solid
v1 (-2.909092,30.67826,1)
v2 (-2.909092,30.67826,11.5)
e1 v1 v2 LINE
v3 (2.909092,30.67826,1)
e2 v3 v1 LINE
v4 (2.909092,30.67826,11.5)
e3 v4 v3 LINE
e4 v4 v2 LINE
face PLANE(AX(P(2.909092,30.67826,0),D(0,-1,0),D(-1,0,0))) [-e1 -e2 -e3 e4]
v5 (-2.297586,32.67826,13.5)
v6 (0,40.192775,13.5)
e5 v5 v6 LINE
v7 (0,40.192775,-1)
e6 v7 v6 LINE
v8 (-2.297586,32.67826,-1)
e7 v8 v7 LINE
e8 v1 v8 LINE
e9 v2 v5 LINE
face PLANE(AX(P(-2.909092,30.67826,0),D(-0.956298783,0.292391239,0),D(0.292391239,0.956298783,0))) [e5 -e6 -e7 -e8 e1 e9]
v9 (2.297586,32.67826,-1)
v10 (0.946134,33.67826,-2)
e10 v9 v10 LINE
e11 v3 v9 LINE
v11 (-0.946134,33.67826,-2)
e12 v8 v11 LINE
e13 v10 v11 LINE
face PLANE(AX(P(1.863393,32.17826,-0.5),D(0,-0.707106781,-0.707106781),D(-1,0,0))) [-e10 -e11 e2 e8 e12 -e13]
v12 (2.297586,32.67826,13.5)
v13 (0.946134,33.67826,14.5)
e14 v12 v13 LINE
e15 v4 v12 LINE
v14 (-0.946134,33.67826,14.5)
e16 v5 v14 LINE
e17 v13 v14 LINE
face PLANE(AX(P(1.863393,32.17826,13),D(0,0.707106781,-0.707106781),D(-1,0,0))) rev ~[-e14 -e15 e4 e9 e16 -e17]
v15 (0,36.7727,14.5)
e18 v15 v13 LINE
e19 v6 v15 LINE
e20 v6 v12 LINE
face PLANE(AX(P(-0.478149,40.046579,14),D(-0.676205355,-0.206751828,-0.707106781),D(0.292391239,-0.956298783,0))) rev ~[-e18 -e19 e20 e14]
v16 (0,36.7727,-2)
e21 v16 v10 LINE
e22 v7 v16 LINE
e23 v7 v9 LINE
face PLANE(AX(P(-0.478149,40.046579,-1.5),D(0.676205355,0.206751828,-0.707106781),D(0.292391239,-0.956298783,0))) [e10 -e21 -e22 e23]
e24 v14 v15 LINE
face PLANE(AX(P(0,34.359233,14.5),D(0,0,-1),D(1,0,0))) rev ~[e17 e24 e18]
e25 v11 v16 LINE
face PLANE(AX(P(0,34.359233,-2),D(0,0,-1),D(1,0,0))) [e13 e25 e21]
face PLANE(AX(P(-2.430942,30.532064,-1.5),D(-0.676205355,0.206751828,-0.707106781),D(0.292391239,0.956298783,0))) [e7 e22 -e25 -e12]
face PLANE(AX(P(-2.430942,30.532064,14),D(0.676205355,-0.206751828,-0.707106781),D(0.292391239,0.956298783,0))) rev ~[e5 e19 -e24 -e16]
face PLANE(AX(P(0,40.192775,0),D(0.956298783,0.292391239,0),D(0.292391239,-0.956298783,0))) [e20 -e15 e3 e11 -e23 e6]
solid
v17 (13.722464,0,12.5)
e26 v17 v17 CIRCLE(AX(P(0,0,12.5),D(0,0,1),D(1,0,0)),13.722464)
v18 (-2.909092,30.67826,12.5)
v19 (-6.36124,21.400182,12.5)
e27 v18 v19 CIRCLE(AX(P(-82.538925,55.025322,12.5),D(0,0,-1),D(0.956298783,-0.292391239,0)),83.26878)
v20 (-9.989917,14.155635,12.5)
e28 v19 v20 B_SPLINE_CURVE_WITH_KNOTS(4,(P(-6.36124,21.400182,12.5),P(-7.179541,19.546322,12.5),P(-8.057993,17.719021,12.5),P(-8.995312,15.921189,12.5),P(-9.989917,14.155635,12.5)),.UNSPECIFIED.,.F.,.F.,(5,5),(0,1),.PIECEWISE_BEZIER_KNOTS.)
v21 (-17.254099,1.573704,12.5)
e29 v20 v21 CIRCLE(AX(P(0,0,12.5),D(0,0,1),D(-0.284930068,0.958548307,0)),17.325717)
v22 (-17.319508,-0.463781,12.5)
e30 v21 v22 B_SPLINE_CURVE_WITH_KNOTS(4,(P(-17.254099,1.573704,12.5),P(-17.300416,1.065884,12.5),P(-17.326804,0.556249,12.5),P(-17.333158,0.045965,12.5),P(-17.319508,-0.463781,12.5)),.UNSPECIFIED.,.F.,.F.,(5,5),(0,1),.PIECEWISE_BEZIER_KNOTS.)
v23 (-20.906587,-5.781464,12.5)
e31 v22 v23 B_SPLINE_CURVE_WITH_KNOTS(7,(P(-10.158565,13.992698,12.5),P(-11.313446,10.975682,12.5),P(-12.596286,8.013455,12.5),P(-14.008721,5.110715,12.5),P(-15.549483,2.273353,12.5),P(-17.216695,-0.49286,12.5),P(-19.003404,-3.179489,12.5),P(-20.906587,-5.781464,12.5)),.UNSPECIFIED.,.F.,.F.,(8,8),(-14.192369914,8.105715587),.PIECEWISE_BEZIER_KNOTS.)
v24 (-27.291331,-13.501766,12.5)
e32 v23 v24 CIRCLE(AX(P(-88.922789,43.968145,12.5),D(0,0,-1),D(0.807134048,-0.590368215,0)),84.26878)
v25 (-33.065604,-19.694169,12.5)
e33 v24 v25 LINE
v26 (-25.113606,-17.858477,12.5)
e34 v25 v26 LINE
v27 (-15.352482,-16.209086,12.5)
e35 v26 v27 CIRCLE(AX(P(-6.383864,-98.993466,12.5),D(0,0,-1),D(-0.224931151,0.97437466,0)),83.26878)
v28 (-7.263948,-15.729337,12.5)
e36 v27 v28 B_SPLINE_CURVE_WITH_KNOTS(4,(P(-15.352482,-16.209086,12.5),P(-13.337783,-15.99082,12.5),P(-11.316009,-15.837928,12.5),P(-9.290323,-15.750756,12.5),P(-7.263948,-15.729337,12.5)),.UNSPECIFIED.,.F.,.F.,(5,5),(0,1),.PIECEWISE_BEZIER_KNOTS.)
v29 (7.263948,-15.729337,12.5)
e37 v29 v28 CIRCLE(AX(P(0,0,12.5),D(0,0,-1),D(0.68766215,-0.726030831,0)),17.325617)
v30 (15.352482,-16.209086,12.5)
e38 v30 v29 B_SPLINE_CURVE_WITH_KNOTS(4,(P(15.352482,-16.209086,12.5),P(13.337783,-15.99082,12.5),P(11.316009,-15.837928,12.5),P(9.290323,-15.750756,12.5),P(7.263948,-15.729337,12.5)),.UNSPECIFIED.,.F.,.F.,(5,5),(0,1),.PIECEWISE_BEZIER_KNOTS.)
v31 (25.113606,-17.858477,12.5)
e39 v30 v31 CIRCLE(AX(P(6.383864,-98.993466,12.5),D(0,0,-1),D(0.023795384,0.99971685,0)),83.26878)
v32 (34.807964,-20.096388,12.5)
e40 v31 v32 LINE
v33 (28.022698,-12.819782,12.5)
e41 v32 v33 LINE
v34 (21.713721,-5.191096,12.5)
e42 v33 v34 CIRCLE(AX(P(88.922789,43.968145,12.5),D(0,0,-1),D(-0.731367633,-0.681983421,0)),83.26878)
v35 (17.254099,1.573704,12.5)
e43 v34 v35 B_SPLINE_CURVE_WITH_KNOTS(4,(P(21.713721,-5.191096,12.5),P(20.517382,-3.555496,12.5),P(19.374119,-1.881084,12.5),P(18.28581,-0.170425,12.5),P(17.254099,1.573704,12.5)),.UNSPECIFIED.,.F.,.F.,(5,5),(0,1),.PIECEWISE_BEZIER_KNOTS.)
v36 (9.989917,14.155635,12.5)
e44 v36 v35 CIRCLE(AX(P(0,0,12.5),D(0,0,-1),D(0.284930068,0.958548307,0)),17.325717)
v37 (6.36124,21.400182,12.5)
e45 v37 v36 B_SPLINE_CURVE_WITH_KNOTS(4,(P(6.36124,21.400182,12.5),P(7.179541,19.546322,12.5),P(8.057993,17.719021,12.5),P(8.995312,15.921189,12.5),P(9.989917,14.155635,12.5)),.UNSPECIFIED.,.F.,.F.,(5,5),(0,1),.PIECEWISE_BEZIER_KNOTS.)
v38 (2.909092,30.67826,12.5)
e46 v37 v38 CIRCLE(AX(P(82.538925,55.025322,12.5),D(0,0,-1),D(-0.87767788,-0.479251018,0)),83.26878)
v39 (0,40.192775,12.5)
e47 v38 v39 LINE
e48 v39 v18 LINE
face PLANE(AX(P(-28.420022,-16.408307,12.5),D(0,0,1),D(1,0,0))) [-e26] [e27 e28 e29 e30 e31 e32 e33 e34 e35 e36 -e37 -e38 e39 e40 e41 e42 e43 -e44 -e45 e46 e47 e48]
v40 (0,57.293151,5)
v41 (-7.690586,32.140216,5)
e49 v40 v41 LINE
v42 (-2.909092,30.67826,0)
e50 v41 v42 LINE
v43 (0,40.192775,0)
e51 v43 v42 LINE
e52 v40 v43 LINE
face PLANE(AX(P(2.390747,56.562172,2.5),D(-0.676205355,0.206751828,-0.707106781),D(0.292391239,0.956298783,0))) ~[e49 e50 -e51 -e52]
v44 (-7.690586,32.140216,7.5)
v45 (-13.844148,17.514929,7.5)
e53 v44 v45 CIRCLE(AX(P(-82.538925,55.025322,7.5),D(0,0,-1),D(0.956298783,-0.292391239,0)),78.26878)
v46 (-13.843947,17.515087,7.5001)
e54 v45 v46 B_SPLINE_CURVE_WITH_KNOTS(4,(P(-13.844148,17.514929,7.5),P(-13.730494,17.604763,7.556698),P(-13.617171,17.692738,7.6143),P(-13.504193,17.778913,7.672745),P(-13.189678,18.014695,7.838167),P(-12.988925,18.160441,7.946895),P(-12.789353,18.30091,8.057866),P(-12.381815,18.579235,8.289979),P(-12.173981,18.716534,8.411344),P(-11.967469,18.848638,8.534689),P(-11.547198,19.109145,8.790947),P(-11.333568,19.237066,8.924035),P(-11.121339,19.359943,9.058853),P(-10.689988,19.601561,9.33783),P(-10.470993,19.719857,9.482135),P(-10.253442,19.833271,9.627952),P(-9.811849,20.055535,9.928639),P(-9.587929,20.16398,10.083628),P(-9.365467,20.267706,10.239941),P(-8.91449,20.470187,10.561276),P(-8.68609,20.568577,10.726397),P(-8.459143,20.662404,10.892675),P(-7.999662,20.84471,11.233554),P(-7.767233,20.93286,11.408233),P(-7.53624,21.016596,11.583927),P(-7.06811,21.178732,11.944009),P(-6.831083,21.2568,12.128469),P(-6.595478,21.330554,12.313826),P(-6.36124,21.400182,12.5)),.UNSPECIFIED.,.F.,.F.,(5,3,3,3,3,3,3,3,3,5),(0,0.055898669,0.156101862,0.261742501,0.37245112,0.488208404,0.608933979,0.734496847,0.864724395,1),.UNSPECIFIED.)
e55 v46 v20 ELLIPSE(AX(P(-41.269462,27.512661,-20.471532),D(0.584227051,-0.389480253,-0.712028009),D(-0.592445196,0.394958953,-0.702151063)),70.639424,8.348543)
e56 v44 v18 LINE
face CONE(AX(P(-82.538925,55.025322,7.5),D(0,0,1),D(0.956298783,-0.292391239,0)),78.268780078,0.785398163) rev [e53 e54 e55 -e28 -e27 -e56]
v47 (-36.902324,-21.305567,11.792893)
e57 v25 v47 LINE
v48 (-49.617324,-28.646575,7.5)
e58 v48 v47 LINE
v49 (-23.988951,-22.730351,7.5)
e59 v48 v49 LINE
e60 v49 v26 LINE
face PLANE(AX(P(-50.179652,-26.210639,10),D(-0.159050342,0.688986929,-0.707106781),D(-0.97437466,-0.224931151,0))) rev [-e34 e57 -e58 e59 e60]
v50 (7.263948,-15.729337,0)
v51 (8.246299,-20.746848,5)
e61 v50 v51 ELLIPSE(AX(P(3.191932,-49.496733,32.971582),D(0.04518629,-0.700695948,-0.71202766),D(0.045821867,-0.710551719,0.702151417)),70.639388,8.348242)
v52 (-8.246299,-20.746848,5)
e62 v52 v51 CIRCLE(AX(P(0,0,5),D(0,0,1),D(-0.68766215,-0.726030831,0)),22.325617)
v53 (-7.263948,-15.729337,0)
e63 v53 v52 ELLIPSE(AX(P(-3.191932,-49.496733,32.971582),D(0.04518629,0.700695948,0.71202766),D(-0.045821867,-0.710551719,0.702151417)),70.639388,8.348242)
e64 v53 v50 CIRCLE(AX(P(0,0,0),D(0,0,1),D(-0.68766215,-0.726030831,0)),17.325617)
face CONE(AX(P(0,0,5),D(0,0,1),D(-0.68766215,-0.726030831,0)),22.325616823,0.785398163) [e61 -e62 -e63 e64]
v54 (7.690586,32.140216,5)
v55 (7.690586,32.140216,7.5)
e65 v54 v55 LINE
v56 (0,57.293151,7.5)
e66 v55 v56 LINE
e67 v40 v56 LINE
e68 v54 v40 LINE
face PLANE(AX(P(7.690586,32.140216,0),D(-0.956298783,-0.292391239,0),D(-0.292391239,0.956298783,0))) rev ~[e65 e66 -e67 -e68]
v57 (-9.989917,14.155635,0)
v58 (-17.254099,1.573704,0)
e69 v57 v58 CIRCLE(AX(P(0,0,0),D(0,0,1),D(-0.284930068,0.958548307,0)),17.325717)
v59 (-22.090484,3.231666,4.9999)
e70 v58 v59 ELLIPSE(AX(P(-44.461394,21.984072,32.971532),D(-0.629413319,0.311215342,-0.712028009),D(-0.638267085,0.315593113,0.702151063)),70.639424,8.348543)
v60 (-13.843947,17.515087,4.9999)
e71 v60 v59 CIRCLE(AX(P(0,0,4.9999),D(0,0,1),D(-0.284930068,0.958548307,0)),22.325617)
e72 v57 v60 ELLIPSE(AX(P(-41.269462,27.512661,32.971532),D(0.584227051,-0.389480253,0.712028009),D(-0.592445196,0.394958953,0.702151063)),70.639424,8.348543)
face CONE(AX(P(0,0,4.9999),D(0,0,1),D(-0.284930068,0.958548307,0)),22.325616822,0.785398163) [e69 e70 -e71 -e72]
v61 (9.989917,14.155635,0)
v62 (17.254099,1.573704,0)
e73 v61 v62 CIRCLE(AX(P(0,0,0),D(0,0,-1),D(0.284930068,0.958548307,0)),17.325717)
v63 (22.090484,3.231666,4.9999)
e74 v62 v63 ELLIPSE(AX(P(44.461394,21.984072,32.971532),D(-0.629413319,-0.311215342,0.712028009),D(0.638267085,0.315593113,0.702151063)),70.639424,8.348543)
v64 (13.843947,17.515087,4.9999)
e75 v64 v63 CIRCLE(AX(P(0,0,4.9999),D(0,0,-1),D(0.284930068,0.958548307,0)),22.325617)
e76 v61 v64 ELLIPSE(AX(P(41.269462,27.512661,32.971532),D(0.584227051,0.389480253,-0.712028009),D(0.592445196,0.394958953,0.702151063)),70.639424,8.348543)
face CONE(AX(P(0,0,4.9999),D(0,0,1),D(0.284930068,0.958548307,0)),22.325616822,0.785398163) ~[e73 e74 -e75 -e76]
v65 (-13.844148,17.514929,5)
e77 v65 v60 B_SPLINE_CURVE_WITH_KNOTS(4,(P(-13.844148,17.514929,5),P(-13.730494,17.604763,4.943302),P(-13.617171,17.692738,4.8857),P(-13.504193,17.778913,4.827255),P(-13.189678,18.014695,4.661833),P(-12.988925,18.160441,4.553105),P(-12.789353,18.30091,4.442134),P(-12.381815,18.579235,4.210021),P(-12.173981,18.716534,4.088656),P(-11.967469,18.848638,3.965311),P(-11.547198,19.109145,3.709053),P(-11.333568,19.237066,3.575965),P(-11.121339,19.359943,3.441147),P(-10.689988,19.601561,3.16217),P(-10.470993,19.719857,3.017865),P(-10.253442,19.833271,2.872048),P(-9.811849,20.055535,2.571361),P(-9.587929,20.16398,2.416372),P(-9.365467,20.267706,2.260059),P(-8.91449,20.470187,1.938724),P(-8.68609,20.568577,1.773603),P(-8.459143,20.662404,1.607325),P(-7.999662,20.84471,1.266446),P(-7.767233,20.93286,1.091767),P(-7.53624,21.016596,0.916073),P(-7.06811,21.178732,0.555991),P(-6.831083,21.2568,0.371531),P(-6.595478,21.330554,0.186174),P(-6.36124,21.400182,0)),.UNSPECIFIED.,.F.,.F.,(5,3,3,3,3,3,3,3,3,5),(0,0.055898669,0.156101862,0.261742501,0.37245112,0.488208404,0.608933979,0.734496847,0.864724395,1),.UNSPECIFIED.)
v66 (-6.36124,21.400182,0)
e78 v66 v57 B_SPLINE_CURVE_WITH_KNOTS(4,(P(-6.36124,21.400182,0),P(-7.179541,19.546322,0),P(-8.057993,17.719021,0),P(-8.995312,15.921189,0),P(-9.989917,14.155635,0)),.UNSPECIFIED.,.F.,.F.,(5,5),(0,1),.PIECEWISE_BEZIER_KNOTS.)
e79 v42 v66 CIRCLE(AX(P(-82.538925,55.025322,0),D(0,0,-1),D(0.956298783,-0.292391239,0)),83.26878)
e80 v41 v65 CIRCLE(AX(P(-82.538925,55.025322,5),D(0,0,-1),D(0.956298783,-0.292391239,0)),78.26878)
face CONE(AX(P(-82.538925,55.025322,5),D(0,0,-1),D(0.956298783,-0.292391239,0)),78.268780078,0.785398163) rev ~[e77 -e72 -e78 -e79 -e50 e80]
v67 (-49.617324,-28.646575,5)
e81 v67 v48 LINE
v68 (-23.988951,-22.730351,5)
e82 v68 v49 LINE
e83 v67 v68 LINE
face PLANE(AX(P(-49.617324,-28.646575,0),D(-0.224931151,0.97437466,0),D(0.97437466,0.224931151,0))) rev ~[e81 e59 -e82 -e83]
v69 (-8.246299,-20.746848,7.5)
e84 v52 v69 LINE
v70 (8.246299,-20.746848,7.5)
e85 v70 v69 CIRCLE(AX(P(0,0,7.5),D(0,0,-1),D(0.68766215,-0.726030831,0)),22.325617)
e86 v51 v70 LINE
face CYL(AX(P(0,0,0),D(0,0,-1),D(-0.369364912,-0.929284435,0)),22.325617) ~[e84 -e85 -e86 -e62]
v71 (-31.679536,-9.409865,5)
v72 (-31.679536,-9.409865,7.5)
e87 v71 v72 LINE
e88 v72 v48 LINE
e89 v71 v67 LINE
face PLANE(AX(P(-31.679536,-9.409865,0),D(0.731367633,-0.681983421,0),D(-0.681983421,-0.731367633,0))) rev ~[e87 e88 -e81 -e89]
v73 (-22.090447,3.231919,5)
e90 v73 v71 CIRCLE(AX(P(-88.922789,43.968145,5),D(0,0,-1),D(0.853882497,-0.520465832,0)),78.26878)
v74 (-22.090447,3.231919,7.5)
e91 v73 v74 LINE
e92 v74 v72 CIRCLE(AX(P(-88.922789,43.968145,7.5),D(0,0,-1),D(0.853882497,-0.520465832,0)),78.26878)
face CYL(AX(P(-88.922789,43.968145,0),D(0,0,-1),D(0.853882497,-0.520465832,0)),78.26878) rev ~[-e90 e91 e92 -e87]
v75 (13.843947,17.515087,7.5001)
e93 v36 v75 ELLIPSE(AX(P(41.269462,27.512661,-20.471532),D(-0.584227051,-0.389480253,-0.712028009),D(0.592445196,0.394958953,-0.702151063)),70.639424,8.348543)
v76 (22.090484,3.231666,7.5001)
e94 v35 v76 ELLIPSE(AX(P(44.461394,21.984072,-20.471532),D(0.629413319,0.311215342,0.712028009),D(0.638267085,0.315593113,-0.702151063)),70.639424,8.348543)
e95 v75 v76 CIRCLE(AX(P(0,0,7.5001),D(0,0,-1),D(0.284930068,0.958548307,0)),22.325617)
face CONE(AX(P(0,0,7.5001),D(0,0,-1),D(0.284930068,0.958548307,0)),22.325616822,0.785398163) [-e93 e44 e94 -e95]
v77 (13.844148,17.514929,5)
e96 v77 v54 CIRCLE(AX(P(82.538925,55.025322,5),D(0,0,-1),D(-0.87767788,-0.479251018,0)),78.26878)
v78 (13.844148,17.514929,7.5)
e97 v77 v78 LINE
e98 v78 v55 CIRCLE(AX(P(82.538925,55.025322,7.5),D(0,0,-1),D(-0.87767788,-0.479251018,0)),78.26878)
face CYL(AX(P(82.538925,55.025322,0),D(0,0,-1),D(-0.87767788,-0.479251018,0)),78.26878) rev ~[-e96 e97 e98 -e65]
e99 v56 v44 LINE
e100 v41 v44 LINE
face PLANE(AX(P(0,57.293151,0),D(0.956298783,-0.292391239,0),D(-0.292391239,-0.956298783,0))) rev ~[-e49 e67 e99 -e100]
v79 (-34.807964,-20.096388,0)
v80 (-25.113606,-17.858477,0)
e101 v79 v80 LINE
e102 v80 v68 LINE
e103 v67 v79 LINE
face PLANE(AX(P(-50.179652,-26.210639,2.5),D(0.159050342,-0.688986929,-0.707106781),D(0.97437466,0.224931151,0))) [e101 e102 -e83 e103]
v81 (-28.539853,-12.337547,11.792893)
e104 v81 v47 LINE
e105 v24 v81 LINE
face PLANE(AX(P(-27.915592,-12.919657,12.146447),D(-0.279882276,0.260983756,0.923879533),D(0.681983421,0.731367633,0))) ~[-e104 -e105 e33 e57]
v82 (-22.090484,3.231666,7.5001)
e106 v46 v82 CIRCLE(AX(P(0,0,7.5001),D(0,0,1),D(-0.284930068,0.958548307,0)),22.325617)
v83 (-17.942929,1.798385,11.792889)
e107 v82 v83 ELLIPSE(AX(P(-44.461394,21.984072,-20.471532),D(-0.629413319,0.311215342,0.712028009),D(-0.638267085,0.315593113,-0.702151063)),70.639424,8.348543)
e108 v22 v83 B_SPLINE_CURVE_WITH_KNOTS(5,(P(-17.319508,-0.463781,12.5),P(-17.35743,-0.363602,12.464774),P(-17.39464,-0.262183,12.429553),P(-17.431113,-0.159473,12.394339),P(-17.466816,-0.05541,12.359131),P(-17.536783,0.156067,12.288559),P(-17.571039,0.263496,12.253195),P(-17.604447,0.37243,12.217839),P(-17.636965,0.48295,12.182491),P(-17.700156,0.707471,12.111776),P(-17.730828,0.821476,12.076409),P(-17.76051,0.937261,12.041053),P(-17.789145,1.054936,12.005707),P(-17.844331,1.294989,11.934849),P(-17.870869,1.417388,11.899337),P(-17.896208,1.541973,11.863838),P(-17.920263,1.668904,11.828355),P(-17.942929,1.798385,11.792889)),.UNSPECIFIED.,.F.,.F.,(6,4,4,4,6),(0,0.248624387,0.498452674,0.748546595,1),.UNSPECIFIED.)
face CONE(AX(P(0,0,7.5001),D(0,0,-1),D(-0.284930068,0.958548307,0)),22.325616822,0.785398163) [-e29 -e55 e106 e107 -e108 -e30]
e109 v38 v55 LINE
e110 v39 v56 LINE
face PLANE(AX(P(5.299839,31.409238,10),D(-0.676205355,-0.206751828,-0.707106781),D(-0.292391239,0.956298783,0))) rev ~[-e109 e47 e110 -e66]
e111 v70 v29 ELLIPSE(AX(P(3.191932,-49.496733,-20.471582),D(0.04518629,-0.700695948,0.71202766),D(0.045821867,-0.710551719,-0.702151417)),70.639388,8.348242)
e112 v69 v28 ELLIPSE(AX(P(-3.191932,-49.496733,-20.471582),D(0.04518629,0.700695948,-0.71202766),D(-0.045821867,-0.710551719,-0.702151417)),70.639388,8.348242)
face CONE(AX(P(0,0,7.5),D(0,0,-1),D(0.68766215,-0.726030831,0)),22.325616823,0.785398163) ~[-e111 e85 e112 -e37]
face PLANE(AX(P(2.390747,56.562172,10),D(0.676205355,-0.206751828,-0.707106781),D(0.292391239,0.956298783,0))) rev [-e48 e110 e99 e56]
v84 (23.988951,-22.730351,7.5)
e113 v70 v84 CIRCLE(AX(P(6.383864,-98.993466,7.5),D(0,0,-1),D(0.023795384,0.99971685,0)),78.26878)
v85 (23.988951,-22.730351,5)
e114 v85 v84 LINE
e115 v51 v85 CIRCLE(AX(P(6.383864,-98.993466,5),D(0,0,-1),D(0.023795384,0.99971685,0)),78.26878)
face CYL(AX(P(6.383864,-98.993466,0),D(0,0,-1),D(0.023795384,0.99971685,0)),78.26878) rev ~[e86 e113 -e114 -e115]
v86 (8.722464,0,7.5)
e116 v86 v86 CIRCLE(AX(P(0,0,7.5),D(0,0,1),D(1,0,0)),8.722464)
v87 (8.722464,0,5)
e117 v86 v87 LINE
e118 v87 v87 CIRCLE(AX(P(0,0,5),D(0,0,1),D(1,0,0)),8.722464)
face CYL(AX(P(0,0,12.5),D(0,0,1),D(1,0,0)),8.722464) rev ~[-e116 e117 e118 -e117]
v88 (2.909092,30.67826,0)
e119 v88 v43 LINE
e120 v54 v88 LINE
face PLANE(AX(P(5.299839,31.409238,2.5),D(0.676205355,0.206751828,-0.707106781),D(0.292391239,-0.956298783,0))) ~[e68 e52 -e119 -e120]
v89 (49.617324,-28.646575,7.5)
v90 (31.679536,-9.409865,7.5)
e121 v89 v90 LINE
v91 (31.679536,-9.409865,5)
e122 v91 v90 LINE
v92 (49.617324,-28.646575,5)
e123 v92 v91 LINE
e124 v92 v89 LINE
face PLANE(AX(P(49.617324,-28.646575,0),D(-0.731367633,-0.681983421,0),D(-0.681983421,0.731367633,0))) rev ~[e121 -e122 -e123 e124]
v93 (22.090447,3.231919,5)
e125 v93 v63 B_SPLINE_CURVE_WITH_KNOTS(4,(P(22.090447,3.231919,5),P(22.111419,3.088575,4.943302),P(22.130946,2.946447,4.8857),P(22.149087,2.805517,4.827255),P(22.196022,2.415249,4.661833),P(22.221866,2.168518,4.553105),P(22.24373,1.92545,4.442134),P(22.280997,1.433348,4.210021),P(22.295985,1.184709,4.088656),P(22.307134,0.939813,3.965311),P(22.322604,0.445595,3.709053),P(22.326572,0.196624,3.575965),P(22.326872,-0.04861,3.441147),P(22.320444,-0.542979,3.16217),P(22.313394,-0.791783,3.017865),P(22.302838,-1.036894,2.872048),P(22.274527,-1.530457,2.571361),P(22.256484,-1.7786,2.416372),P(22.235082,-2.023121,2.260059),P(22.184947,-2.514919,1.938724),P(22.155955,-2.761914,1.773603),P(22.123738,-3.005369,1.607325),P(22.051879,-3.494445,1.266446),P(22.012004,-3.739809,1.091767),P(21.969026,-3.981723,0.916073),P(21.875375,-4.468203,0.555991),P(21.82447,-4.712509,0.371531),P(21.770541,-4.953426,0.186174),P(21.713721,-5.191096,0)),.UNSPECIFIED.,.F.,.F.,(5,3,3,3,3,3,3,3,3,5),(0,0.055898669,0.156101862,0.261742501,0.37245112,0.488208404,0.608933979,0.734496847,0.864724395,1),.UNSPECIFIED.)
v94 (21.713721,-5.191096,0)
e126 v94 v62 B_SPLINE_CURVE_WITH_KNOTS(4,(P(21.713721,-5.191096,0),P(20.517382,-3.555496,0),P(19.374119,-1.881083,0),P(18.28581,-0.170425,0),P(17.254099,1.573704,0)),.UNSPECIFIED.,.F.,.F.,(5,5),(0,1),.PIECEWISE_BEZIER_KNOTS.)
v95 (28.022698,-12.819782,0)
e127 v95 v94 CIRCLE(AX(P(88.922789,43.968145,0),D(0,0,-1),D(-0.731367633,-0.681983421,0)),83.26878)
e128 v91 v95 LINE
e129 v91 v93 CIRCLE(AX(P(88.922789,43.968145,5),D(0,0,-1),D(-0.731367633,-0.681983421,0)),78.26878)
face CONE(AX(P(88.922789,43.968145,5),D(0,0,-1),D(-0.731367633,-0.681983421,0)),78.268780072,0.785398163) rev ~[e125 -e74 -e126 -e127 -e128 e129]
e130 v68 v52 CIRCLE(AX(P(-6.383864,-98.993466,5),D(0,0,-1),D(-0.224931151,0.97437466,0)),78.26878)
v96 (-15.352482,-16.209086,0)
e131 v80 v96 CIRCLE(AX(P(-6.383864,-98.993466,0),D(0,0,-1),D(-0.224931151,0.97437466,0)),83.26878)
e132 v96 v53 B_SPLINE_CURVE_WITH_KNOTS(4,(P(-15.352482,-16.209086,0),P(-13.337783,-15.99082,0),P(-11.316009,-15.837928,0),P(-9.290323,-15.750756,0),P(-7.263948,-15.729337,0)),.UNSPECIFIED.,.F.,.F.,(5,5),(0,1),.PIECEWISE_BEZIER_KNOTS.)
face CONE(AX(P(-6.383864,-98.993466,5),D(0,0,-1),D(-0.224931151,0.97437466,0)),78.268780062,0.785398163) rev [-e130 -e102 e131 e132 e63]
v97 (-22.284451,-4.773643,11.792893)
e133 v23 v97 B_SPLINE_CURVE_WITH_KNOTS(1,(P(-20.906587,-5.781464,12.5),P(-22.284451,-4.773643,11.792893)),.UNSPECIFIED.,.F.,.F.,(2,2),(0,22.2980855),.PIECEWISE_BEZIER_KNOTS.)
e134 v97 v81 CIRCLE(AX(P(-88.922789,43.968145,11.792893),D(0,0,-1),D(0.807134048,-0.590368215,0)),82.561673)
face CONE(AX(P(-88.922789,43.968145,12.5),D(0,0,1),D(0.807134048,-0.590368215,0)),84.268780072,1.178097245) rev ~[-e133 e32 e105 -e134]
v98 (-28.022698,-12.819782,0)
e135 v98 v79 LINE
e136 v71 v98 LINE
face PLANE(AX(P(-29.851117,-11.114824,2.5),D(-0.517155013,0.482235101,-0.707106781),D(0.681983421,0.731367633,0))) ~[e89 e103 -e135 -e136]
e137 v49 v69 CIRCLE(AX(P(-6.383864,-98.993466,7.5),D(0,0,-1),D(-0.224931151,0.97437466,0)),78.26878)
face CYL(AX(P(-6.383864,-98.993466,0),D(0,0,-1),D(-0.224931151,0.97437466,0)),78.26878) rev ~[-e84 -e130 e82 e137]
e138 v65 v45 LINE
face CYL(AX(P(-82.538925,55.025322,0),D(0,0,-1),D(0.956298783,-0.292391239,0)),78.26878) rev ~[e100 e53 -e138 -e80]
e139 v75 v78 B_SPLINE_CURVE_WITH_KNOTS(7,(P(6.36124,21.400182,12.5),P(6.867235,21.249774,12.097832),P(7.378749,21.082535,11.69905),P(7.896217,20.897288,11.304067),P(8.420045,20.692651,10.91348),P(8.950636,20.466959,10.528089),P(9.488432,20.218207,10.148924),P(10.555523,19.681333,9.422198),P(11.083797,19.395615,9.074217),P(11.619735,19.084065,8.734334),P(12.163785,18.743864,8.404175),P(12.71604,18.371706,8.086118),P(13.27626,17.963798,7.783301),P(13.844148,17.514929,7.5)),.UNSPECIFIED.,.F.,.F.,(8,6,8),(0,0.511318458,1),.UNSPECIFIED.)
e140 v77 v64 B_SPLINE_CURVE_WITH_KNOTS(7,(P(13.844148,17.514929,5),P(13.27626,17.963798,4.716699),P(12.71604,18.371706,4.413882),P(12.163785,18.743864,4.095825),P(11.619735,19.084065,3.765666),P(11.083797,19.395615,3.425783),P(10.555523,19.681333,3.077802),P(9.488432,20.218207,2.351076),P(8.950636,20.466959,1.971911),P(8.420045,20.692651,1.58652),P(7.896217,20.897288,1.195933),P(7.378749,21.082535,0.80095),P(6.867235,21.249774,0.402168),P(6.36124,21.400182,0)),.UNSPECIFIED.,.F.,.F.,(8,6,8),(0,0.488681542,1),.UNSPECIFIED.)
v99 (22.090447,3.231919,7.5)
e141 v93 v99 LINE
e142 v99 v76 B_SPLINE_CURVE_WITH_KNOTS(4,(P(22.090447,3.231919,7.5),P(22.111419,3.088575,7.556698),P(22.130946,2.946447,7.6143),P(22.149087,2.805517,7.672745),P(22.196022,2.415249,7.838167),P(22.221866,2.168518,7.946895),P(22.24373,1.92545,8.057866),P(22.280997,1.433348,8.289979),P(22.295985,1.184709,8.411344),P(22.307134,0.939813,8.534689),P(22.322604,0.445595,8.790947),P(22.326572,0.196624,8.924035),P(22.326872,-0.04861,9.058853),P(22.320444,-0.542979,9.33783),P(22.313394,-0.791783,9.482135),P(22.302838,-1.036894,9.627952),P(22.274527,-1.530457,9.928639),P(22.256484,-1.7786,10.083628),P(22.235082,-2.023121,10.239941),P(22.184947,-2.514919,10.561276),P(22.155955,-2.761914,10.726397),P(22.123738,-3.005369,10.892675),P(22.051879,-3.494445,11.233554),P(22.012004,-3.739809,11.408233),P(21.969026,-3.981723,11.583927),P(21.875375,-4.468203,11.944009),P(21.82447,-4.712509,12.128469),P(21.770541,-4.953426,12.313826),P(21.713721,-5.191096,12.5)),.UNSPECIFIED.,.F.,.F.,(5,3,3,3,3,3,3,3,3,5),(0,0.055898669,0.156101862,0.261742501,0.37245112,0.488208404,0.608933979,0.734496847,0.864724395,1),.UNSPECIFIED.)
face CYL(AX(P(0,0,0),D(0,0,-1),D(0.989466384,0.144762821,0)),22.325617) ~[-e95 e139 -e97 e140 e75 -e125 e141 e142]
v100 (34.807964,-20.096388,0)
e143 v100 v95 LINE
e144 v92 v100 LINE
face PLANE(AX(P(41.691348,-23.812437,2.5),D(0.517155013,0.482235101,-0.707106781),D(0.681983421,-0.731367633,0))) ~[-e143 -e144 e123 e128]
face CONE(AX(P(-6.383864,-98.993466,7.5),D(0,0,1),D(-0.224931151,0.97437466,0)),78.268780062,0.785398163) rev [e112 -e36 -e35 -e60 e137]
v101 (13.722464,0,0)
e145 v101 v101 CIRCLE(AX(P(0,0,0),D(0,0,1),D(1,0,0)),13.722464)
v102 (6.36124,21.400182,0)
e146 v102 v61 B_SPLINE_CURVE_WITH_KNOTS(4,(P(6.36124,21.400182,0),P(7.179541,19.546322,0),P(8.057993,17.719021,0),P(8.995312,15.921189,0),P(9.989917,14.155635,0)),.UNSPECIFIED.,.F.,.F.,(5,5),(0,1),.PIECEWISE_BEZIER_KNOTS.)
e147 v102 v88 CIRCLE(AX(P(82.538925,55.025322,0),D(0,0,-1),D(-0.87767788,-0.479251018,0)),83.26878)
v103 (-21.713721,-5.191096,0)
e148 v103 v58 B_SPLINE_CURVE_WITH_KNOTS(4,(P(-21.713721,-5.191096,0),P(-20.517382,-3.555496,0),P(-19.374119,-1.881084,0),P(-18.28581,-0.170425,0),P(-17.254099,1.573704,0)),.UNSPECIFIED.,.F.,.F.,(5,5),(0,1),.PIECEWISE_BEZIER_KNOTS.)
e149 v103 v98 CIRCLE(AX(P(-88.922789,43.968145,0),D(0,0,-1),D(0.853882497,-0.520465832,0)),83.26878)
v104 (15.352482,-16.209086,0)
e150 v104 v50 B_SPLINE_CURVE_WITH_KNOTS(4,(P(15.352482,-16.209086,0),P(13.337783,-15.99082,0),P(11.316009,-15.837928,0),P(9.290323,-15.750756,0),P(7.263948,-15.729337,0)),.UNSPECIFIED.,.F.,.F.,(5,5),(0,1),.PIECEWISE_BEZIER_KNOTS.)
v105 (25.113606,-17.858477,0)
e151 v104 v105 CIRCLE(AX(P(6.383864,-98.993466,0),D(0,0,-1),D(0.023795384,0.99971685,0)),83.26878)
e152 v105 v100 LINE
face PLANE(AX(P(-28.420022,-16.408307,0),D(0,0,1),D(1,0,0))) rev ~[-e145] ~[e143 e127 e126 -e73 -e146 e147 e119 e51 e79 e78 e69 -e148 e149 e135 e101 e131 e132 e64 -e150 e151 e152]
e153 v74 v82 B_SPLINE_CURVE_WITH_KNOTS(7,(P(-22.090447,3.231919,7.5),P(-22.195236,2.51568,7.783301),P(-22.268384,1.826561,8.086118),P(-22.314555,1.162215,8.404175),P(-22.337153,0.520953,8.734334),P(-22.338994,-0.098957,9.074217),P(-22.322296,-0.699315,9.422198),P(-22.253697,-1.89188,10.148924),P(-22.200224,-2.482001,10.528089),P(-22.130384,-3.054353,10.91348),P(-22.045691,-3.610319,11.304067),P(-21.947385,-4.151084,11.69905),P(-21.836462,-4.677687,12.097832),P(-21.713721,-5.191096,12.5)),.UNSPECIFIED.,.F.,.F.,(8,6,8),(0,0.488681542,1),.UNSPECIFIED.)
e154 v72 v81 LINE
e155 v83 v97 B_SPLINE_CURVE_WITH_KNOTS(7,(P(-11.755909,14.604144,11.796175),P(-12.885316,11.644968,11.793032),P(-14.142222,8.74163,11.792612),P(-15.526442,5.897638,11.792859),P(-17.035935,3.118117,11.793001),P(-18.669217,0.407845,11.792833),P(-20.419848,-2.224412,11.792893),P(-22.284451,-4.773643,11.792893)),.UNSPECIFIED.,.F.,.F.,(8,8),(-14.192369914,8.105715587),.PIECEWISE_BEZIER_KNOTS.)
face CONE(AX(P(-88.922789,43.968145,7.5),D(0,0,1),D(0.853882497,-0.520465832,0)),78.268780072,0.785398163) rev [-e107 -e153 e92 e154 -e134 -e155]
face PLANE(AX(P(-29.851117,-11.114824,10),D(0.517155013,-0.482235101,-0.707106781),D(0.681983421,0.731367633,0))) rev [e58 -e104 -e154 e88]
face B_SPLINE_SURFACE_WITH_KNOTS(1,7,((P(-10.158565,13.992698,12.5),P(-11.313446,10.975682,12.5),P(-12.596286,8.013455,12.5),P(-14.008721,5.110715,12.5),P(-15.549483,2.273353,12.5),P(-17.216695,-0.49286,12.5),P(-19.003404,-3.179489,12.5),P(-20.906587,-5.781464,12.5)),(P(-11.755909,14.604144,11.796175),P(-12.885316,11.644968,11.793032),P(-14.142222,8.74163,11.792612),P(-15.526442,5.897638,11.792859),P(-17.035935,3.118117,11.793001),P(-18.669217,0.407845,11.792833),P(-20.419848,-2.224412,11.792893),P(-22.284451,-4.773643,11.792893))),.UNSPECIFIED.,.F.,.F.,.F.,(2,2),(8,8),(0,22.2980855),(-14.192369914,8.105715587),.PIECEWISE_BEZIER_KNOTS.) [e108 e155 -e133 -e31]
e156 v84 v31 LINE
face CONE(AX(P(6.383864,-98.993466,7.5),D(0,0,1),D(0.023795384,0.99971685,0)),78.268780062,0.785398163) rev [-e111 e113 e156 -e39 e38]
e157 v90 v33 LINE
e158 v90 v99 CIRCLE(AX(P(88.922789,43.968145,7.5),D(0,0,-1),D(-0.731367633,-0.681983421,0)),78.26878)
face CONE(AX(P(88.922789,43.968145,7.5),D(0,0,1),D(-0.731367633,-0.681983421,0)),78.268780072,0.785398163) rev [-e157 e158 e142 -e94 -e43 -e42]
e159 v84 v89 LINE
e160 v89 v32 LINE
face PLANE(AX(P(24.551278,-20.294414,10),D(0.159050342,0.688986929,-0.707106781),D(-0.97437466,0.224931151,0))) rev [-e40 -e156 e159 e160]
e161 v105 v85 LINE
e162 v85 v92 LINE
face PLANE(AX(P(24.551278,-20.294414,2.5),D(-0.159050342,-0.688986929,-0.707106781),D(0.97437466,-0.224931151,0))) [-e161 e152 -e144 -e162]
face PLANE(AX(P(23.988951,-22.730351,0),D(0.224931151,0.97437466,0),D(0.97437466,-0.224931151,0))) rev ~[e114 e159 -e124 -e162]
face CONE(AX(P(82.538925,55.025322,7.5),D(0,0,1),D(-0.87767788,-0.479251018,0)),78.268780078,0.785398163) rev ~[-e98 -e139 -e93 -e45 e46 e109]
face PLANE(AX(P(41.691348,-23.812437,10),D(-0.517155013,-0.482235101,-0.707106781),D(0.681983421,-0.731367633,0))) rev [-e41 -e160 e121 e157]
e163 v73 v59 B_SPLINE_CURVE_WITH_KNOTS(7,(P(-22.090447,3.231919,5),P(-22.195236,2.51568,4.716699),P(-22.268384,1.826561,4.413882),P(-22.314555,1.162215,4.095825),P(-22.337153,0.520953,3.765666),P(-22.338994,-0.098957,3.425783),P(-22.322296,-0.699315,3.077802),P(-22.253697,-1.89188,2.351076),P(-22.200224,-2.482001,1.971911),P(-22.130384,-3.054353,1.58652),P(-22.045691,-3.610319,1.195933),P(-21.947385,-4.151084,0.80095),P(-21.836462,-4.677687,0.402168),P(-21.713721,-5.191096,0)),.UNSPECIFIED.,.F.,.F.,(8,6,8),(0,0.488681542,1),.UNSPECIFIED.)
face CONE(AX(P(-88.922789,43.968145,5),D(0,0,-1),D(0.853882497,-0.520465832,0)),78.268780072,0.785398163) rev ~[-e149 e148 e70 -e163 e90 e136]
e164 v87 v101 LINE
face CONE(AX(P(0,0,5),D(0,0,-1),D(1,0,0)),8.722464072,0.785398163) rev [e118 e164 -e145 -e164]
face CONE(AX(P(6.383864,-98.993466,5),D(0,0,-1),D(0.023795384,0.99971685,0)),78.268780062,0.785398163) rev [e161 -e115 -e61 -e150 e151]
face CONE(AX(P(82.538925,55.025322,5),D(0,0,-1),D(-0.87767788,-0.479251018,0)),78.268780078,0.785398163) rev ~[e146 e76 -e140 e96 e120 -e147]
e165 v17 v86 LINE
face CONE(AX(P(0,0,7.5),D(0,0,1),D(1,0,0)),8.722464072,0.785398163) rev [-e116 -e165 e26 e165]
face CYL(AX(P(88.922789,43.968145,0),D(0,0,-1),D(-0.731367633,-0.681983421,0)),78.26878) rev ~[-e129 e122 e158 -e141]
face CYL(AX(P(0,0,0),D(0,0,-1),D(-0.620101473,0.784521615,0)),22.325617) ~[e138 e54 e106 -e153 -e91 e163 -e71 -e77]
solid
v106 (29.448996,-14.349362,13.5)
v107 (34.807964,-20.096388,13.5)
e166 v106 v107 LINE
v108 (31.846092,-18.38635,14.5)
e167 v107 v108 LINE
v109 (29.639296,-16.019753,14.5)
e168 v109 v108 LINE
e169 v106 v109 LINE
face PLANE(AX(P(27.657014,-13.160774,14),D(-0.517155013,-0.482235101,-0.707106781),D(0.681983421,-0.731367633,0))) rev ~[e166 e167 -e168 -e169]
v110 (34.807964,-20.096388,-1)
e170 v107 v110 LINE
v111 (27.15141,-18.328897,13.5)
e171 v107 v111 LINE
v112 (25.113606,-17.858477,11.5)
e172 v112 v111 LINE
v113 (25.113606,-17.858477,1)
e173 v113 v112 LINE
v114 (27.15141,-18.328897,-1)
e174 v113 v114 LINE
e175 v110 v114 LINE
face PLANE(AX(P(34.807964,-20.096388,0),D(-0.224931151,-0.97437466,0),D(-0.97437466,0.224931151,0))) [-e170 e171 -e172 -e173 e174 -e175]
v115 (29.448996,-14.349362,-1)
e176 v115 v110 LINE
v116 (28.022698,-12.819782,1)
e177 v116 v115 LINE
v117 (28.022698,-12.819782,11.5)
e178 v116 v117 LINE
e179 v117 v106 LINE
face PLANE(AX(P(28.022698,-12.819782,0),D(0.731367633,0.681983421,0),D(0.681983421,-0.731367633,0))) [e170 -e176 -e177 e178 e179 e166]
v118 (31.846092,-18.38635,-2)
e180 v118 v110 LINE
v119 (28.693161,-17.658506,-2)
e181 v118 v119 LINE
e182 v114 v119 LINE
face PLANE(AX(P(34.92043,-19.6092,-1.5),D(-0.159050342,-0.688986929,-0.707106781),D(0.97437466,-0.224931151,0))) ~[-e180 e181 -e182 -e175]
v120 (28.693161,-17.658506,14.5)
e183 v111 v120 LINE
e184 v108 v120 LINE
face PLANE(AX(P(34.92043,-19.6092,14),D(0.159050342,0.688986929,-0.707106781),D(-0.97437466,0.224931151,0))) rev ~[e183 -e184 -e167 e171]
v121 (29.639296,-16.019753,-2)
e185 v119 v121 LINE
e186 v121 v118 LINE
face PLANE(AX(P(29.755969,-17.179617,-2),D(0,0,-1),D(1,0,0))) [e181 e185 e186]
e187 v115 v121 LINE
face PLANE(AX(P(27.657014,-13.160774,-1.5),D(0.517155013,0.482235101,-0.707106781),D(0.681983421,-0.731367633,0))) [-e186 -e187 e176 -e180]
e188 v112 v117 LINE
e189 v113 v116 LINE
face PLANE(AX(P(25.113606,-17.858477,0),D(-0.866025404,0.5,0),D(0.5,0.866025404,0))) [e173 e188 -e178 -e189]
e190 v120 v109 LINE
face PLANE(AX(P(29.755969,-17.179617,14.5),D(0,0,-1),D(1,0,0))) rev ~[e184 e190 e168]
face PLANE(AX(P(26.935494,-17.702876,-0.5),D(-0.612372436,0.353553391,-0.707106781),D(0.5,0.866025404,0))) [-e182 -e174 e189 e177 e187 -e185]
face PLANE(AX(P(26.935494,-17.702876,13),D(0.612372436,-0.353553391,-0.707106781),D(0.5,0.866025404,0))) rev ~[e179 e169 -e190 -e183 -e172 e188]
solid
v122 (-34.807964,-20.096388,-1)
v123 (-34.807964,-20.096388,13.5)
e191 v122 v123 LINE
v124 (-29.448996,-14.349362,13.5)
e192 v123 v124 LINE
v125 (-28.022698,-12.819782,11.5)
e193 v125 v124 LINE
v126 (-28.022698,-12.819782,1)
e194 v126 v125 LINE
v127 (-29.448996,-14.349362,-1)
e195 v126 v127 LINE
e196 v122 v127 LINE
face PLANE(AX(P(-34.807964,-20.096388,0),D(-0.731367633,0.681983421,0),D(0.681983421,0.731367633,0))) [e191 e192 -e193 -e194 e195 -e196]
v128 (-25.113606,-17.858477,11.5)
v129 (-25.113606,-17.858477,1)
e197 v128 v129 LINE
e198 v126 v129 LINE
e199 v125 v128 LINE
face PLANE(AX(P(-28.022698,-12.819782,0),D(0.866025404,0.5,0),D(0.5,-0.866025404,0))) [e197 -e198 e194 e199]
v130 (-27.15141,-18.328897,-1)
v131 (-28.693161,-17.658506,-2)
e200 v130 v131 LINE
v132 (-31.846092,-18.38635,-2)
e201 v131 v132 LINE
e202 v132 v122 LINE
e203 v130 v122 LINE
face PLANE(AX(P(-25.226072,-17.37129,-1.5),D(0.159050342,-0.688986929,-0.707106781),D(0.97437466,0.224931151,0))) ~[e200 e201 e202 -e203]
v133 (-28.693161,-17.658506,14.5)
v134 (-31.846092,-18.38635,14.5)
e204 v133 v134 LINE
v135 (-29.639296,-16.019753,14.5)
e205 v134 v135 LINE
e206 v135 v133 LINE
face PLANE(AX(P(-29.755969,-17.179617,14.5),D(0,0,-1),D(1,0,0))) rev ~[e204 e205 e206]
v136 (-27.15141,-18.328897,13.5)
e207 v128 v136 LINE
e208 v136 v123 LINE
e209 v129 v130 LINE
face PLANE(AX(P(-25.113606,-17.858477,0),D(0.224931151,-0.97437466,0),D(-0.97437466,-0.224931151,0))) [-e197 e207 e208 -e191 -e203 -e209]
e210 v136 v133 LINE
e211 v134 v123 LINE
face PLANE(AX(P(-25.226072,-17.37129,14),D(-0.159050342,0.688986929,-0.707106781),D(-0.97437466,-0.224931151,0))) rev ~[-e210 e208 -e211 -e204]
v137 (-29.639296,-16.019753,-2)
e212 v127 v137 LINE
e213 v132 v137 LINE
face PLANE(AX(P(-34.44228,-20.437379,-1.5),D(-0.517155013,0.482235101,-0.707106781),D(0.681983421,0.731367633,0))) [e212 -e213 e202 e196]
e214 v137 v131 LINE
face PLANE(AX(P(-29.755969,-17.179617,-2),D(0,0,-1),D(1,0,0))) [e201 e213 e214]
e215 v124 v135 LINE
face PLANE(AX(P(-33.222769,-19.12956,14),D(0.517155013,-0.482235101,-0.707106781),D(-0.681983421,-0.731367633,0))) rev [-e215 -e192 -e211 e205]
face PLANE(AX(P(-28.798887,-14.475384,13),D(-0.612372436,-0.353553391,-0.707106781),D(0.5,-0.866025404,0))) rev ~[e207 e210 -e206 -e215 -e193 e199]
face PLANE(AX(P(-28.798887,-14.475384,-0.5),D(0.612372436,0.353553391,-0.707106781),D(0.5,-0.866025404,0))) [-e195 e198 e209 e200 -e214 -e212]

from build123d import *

# Parameters (mm, degrees)
F1_DEPTH      = 12.5
F2_R          = 8.722464072
F3_DEPTH      = 25
F4_C1_SIZE    = 5
F4_C2_SIZE    = 5
F4_C3_SIZE    = 5
F4_C4_SIZE    = 5
F4_C5_SIZE    = 5
F4_C6_SIZE    = 5
F4_C7_SIZE    = 5
F4_C8_SIZE    = 5
F4_C9_SIZE    = 5
F4_C10_SIZE   = 5
F4_C11_SIZE   = 5
F4_C12_SIZE   = 5
F4_C13_SIZE   = 5
F4_C14_SIZE   = 5
F4_C15_SIZE   = 4.9999
F4_C16_SIZE   = 4.9999
F4_C17_SIZE   = 4.9999
F4_C18_SIZE   = 4.9999
F6_DEPTH      = 2
F6_DEPTH_BACK = 14.5
F7_SIZE       = 1
F7_2_SIZE     = 1
F7_3_SIZE     = 1
F7_4_SIZE     = 1
F8_SIZE       = 1
F9_SIZE       = 5
F10_SIZE      = 3
F10_2_SIZE    = 3
F10_3_SIZE    = 3


# Not quite as in the source:
# - a fillet or chamfer is up to 0.001 mm smaller than in the source, because OpenCascade refuses the exact size


with BuildPart() as f1:
    # F0 (on Top) → F1 (new body)
    with BuildSketch(Plane.XY):
        with BuildLine():
            ThreePointArc((-8.2462994883, -20.746848224), (-19.3345513229, -11.162808411), (-22.0904473546, 3.2319192679))
            ThreePointArc((-22.0904473546, 3.2319192679), (-26.5638124389, -3.3325951278), (-31.6795363045, -9.4098653834))
            Line((-31.6795363045, -9.4098653834), (-49.6173238599, -28.646575287))
            Line((-49.6173238599, -28.646575287), (-23.9889506205, -22.7303505281))
            ThreePointArc((-23.9889506205, -22.7303505281), (-16.1680182607, -21.3386388295), (-8.2462994883, -20.746848224))
        make_face()
        with BuildLine():
            ThreePointArc((-7.690585684, 32.1402159115), (-10.3957941782, 24.6712339574), (-13.8441478662, 17.5149289561))
            ThreePointArc((-13.8441478662, 17.5149289561), (-19.3345513229, 11.162808411), (-22.0904473546, 3.2319192679))
            ThreePointArc((-22.0904473546, 3.2319192679), (-19.3345513229, -11.162808411), (-8.2462994883, -20.746848224))
            ThreePointArc((-8.2462994883, -20.746848224), (0, -22.3256168219), (8.2462994883, -20.746848224))
            ThreePointArc((8.2462994883, -20.746848224), (19.3345513229, -11.162808411), (22.0904473546, 3.2319192679))
            ThreePointArc((22.0904473546, 3.2319192679), (19.3345513229, 11.162808411), (13.8441478662, 17.5149289561))
            ThreePointArc((13.8441478662, 17.5149289561), (10.3957941782, 24.6712339574), (7.690585684, 32.1402159115))
            Line((7.690585684, 32.1402159115), (0, 57.293150574))
            Line((0, 57.293150574), (-7.690585684, 32.1402159115))
        make_face()
        with BuildLine():
            ThreePointArc((22.0904473546, 3.2319192679), (19.3345513229, -11.162808411), (8.2462994883, -20.746848224))
            ThreePointArc((8.2462994883, -20.746848224), (16.1680182607, -21.3386388295), (23.9889506205, -22.7303505281))
            Line((23.9889506205, -22.7303505281), (49.6173238599, -28.646575287))
            Line((49.6173238599, -28.646575287), (31.6795363045, -9.4098653834))
            ThreePointArc((31.6795363045, -9.4098653834), (26.5638124389, -3.3325951278), (22.0904473546, 3.2319192679))
        make_face()
    extrude(amount=F1_DEPTH)

    # F2 (on face) → F3 (cut)
    with BuildSketch(Plane.XY.offset(12.5)):
        Circle(F2_R)
    extrude(amount=-F3_DEPTH, mode=Mode.SUBTRACT)

    # F4: chamfer of 5 on 18 edges, made by hand

    # F4_c1
    f4_c1_edges = [f1.edges().sort_by_distance(p)[0] for p in [
        (-16.1680182607, -21.3386388295, 0),
        (-36.8031372402, -25.6884629075, 0),
    ]]
    chamfer(f4_c1_edges, length=F4_C1_SIZE)

    # F4_c2
    f4_c2_edges = [f1.edges().sort_by_distance(p)[0] for p in [
        (-16.1680182607, -21.3386388295, 12.5),
        (-36.8031372402, -25.6884629075, 12.5),
    ]]
    chamfer(f4_c2_edges, length=F4_C2_SIZE)

    # F4_c3
    f4_c3_edges = [f1.edges().sort_by_distance(p)[0] for p in [
        (-37.5996515992, -15.7586717882, 0),
        (-26.5638124389, -3.3325951278, 0),
    ]]
    chamfer(f4_c3_edges, length=F4_C3_SIZE)

    # F4_c4
    f4_c4_edges = [f1.edges().sort_by_distance(p)[0] for p in [
        (16.1680182607, -21.3386388295, 0),
        (36.8031372402, -25.6884629075, 0),
    ]]
    chamfer(f4_c4_edges, length=F4_C4_SIZE)

    # F4_c5
    f4_c5_edges = [f1.edges().sort_by_distance(p)[0] for p in [
        (37.5996515992, -15.7586717882, 0),
        (26.5638124389, -3.3325951278, 0),
    ]]
    chamfer(f4_c5_edges, length=F4_C5_SIZE)

    # F4_c6
    f4_c6_edges = [f1.edges().sort_by_distance(p)[0] for p in [
        (-10.3957941782, 24.6712339574, 0),
        (-3.845292842, 44.7166832427, 0),
    ]]
    chamfer(f4_c6_edges, length=F4_C6_SIZE)

    # F4_c7
    f4_c7_edges = [f1.edges().sort_by_distance(p)[0] for p in [
        (5.1524157011, 40.4415893525, 0),
        (10.3957941782, 24.6712339574, 0),
    ]]
    chamfer(f4_c7_edges, length=F4_C7_SIZE)

    # F4_c8
    f4_c8_edges = [f1.edges().sort_by_distance(p)[0] for p in [
        (-37.5996515992, -15.7586717882, 12.5),
        (-26.5638124389, -3.3325951278, 12.5),
    ]]
    chamfer(f4_c8_edges, length=F4_C8_SIZE)

    # F4_c9
    f4_c9_edges = [f1.edges().sort_by_distance(p)[0] for p in [
        (16.1680182607, -21.3386388295, 12.5),
        (36.8031372402, -25.6884629075, 12.5),
    ]]
    chamfer(f4_c9_edges, length=F4_C9_SIZE)

    # F4_c10
    f4_c10_edges = [f1.edges().sort_by_distance(p)[0] for p in [
        (37.5996515992, -15.7586717882, 12.5),
        (26.5638124389, -3.3325951278, 12.5),
    ]]
    chamfer(f4_c10_edges, length=F4_C10_SIZE)

    # F4_c11
    f4_c11_edges = [f1.edges().sort_by_distance(p)[0] for p in [
        (-10.3957941782, 24.6712339574, 12.5),
        (-3.845292842, 44.7166832427, 12.5),
    ]]
    chamfer(f4_c11_edges, length=F4_C11_SIZE)

    # F4_c12
    f4_c12_edges = [f1.edges().sort_by_distance(p)[0] for p in [
        (5.1524157011, 40.4415893525, 12.5),
        (10.3957941782, 24.6712339574, 12.5),
    ]]
    chamfer(f4_c12_edges, length=F4_C12_SIZE)

    # F4_c13
    f4_c13_edges = [f1.edges().sort_by_distance(p)[0] for p in [
        (0, -22.3256168219, 0),
    ]]
    chamfer(f4_c13_edges, length=F4_C13_SIZE)

    # F4_c14
    f4_c14_edges = [f1.edges().sort_by_distance(p)[0] for p in [
        (0, -22.3256168219, 12.5),
    ]]
    chamfer(f4_c14_edges, length=F4_C14_SIZE)

    # F4_c15 (size 5 in the source; OpenCascade refuses exactly that, so slightly less here)
    f4_c15_edges = [f1.edges().sort_by_distance(p)[0] for p in [
        (-19.3345513229, 11.162808411, 0),
    ]]
    chamfer(f4_c15_edges, length=F4_C15_SIZE)

    # F4_c16 (size 5 in the source; OpenCascade refuses exactly that, so slightly less here)
    f4_c16_edges = [f1.edges().sort_by_distance(p)[0] for p in [
        (19.3345513229, 11.162808411, 0),
    ]]
    chamfer(f4_c16_edges, length=F4_C16_SIZE)

    # F4_c17 (size 5 in the source; OpenCascade refuses exactly that, so slightly less here)
    f4_c17_edges = [f1.edges().sort_by_distance(p)[0] for p in [
        (-19.3345513229, 11.162808411, 12.5),
    ]]
    chamfer(f4_c17_edges, length=F4_C17_SIZE)

    # F4_c18 (size 5 in the source; OpenCascade refuses exactly that, so slightly less here)
    f4_c18_edges = [f1.edges().sort_by_distance(p)[0] for p in [
        (19.3345513229, 11.162808411, 12.5),
    ]]
    chamfer(f4_c18_edges, length=F4_C18_SIZE)

    # F7#4
    f7_4_edges = [f1.edges().sort_by_distance(p)[0] for p in [
        (-31.415331, -16.458085, 12.5),
    ]]
    chamfer(f7_4_edges, length=F7_4_SIZE)

    # F9
    f9_edges = [f1.edges().sort_by_distance(p)[0] for p in [
        (-8.722464, 0, 12.5),
        (-8.722464, 0, 0),
    ]]
    chamfer(f9_edges, length=F9_SIZE)


with BuildPart() as f6:
    # F5 (on face) → F6 (new body, two sides)
    with BuildSketch(Plane(origin=(0, 0, 0), x_dir=(1, 0, 0), z_dir=(0, 0, -1))) as f6_sk:
        Polygon((-28.0226981411, 12.8197824861), (-25.1136063745, 17.8584772298), (-34.8079642097, 20.0963875064), align=None)
    extrude(amount=F6_DEPTH)
    extrude(f6_sk.sketch, amount=-F6_DEPTH_BACK)

    # F7#2
    f7_2_edges = [f6.edges().sort_by_distance(p)[0] for p in [
        (-29.960785, -18.977432, -2),
        (-31.415331, -16.458085, -2),
        (-29.960785, -18.977432, 14.5),
    ]]
    chamfer(f7_2_edges, length=F7_2_SIZE)

    # F8
    f8_edges = [f6.edges().sort_by_distance(p)[0] for p in [
        (-30.805575, -15.804175, 14.5),
    ]]
    chamfer(f8_edges, length=F8_SIZE)

    # F10#2
    f10_2_edges = [f6.edges().sort_by_distance(p)[0] for p in [
        (-26.568152, -15.33913, 14.5),
        (-26.568152, -15.33913, -2),
    ]]
    chamfer(f10_2_edges, length=F10_2_SIZE)


with BuildPart() as f6b:
    # F5 (on face) → F6, piece 2 (new body, two sides)
    with BuildSketch(Plane(origin=(0, 0, 0), x_dir=(1, 0, 0), z_dir=(0, 0, -1))) as f6_2_sk:
        Polygon((0, -40.1927750129), (2.9090917667, -30.6782597158), (-2.9090917667, -30.6782597158), align=None)
    extrude(amount=F6_DEPTH)
    extrude(f6_2_sk.sketch, amount=-F6_DEPTH_BACK)

    # F7#3
    f7_3_edges = [f6b.edges().sort_by_distance(p)[0] for p in [
        (1.454546, 35.435517, -2),
        (-1.454546, 35.435517, -2),
        (1.454546, 35.435517, 14.5),
        (-1.454546, 35.435517, 14.5),
    ]]
    chamfer(f7_3_edges, length=F7_3_SIZE)

    # F10
    f10_edges = [f6b.edges().sort_by_distance(p)[0] for p in [
        (0, 30.67826, -2),
        (0, 30.67826, 14.5),
    ]]
    chamfer(f10_edges, length=F10_SIZE)


with BuildPart() as f6c:
    # F5 (on face) → F6, piece 3 (new body, two sides)
    with BuildSketch(Plane(origin=(0, 0, 0), x_dir=(1, 0, 0), z_dir=(0, 0, -1))) as f6_3_sk:
        Polygon((28.0226981411, 12.8197824861), (34.8079642097, 20.0963875064), (25.1136063745, 17.8584772298), align=None)
    extrude(amount=F6_DEPTH)
    extrude(f6_3_sk.sketch, amount=-F6_DEPTH_BACK)

    # F7
    f7_edges = [f6c.edges().sort_by_distance(p)[0] for p in [
        (29.960785, -18.977432, -2),
        (31.415331, -16.458085, -2),
        (31.415331, -16.458085, 14.5),
        (29.960785, -18.977432, 14.5),
    ]]
    chamfer(f7_edges, length=F7_SIZE)

    # F10#3
    f10_3_edges = [f6c.edges().sort_by_distance(p)[0] for p in [
        (26.568152, -15.33913, 14.5),
        (26.568152, -15.33913, -2),
    ]]
    chamfer(f10_3_edges, length=F10_3_SIZE)


solid = Compound([f1.part, f6.part, f6b.part, f6c.part])
